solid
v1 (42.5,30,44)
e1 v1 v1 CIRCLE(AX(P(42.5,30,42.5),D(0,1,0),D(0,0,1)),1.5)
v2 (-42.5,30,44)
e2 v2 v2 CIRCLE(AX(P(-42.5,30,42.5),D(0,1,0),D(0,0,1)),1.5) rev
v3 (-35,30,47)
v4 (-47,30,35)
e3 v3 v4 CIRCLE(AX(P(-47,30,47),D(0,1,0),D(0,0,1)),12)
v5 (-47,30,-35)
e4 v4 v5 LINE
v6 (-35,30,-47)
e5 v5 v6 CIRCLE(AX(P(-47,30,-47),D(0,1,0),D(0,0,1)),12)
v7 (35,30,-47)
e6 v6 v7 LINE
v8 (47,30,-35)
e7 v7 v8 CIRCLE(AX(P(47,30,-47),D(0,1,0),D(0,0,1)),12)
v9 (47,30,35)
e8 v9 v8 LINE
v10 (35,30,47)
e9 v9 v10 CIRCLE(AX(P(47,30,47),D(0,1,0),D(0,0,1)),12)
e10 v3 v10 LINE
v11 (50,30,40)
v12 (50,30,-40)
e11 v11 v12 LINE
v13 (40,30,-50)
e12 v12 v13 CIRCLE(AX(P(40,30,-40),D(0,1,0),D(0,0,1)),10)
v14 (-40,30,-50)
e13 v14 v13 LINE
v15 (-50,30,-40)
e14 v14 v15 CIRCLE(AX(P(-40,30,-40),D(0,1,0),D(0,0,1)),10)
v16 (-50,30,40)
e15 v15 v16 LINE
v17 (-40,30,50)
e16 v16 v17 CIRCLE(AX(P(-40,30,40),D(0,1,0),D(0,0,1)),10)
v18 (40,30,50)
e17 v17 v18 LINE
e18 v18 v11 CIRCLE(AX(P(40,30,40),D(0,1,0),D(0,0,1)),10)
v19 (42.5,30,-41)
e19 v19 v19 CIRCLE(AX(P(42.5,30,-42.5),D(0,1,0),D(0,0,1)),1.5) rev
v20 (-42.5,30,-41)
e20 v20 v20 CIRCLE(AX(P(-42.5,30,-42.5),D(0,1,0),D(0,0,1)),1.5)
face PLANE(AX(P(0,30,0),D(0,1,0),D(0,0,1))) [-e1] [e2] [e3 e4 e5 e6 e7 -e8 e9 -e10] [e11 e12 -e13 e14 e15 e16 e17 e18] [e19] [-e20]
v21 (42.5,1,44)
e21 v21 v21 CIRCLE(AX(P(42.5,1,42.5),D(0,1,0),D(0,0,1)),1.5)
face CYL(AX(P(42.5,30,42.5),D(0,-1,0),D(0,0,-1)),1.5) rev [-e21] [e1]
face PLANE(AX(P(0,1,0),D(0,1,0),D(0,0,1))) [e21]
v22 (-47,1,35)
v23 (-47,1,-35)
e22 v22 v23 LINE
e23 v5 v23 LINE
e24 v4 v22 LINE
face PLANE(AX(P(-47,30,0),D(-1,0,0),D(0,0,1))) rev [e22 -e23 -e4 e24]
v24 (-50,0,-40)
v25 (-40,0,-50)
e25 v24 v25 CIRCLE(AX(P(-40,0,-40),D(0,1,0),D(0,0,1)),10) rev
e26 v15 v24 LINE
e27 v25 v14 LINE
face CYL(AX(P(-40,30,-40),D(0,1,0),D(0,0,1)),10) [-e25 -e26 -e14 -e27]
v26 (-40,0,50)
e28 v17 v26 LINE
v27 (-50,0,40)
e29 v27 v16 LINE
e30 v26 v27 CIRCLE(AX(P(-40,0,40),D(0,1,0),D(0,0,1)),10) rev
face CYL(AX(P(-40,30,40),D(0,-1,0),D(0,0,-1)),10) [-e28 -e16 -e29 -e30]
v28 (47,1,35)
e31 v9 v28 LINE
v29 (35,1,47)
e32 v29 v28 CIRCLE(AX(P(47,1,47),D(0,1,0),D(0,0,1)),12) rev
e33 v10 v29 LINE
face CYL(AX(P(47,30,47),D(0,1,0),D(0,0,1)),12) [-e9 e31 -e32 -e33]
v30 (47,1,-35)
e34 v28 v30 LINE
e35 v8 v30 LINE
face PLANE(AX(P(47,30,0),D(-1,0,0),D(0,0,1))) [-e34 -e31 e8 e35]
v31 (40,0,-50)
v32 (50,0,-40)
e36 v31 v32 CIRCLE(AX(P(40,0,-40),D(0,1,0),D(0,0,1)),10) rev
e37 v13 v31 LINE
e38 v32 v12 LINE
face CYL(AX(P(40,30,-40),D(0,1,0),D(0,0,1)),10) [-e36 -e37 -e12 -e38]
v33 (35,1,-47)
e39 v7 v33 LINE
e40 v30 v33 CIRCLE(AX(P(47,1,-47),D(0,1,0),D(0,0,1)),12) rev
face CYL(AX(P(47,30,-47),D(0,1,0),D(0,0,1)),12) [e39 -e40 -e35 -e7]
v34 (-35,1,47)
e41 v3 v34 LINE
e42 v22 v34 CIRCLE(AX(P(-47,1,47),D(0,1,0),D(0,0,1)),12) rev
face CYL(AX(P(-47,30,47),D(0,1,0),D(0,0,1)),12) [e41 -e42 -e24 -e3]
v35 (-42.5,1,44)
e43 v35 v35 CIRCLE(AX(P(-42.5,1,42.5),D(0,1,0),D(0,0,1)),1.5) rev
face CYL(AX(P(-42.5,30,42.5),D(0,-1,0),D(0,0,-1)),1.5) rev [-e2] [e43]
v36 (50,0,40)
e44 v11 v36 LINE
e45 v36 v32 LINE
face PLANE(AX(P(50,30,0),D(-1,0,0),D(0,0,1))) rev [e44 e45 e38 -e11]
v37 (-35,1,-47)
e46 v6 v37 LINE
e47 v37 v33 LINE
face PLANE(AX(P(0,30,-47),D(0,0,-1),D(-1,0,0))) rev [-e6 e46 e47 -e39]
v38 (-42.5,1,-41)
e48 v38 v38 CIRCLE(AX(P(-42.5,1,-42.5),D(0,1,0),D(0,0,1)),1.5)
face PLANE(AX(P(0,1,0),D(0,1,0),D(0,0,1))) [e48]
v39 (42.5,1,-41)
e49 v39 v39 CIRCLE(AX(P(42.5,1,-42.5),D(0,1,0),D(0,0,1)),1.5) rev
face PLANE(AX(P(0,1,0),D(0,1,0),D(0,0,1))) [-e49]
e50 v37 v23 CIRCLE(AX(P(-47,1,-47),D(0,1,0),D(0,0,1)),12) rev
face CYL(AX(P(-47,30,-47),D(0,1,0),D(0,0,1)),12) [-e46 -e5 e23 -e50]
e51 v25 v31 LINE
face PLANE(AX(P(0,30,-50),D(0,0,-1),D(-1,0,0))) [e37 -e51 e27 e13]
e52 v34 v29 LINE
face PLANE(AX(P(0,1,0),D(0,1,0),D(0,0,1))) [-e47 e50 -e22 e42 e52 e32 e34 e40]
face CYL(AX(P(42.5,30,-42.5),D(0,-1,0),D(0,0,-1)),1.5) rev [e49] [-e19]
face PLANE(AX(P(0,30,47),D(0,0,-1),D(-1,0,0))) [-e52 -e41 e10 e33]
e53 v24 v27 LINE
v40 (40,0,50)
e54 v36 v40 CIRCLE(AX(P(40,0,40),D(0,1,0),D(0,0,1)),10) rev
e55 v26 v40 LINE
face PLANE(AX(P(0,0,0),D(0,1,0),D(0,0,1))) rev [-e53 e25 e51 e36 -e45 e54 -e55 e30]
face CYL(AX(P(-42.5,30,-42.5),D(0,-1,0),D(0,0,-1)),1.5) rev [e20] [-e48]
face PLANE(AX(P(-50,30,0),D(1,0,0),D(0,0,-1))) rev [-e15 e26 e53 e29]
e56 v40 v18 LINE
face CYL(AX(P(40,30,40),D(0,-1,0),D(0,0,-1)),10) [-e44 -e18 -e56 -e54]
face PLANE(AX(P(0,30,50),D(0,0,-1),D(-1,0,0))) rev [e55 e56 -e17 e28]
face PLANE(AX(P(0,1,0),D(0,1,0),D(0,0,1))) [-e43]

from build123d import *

# Parameters (mm, degrees)
SKIZZE1_R                       = 1.5
AUFSATZ_LINEAR_AUSTRAGEN1_DEPTH = 30
AUFSATZ_LINEAR_AUSTRAGEN2_DEPTH = 1
VERRUNDUNG1_R                   = 10
SKIZZE1_4_R                     = 1.5
AUFSATZ_LINEAR_AUSTRAGEN3_DEPTH = 1
VERRUNDUNG2_R                   = 12


with BuildPart() as part:
    # Skizze1 → Aufsatz-Linear austragen1 (new body)
    with BuildSketch(Plane(origin=(0, 0, 0), x_dir=(1, 0, 0), z_dir=(0, 1, 0))):
        Polygon((-50, 50), (50, 50), (50, -50), (-50, -50), (-50, 35), align=None)
        with Locations(Location((42.5, 42.5, 0), (0, 0, 270))):
            Circle(SKIZZE1_R, mode=Mode.SUBTRACT)
        with Locations(Location((-42.5, 42.5, 0), (0, 0, 270))):
            Circle(SKIZZE1_R, mode=Mode.SUBTRACT)
        with Locations(Location((42.5, -42.5, 0), (0, 0, 270))):
            Circle(SKIZZE1_R, mode=Mode.SUBTRACT)
        with Locations(Location((-42.5, -42.5, 0), (0, 0, 270))):
            Circle(SKIZZE1_R, mode=Mode.SUBTRACT)
        Polygon((-47, -35), (-35, -35), (-35, -47), (35, -47), (35, -35), (47, -35), (47, 35), (35, 35), (35, 47), (-35, 47), (-35, 35), (-47, 35), align=None, mode=Mode.SUBTRACT)
    extrude(amount=AUFSATZ_LINEAR_AUSTRAGEN1_DEPTH)

    # Skizze1<3> → Aufsatz-Linear austragen2 (add)
    with BuildSketch(Plane(origin=(0, 0, 0), x_dir=(1, 0, 0), z_dir=(0, 1, 0))):
        Polygon((-47, -35), (-47, 35), (-35, 35), (-35, 47), (35, 47), (35, 35), (47, 35), (47, -35), (35, -35), (35, -47), (-35, -47), (-35, -35), align=None)
    extrude(amount=AUFSATZ_LINEAR_AUSTRAGEN2_DEPTH)

    # Verrundung1
    verrundung1_edges = [part.edges().sort_by_distance(p)[0] for p in [
        (50, 15, -50),
        (50, 15, 50),
        (-50, 15, 50),
        (-50, 15, -50),
    ]]
    fillet(verrundung1_edges, radius=VERRUNDUNG1_R)

    # Skizze1<4> → Aufsatz-Linear austragen3 (add)
    with BuildSketch(Plane(origin=(0, 0, 0), x_dir=(1, 0, 0), z_dir=(0, 1, 0))):
        with Locations(Location((-42.5, 42.5, 0), (0, 0, 270))):
            Circle(SKIZZE1_4_R)
        with Locations(Location((-42.5, -42.5, 0), (0, 0, 270))):
            Circle(SKIZZE1_4_R)
        with Locations(Location((42.5, -42.5, 0), (0, 0, 270))):
            Circle(SKIZZE1_4_R)
        with Locations(Location((42.5, 42.5, 0), (0, 0, 270))):
            Circle(SKIZZE1_4_R)
    extrude(amount=AUFSATZ_LINEAR_AUSTRAGEN3_DEPTH)

    # Verrundung2
    verrundung2_edges = [part.edges().sort_by_distance(p)[0] for p in [
        (35, 15.5, 35),
        (-35, 15.5, 35),
        (35, 15.5, -35),
        (-35, 15.5, -35),
    ]]
    fillet(verrundung2_edges, radius=VERRUNDUNG2_R - 0.0001)  # a hair under: the kernel refuses the full size


solid = part.part
